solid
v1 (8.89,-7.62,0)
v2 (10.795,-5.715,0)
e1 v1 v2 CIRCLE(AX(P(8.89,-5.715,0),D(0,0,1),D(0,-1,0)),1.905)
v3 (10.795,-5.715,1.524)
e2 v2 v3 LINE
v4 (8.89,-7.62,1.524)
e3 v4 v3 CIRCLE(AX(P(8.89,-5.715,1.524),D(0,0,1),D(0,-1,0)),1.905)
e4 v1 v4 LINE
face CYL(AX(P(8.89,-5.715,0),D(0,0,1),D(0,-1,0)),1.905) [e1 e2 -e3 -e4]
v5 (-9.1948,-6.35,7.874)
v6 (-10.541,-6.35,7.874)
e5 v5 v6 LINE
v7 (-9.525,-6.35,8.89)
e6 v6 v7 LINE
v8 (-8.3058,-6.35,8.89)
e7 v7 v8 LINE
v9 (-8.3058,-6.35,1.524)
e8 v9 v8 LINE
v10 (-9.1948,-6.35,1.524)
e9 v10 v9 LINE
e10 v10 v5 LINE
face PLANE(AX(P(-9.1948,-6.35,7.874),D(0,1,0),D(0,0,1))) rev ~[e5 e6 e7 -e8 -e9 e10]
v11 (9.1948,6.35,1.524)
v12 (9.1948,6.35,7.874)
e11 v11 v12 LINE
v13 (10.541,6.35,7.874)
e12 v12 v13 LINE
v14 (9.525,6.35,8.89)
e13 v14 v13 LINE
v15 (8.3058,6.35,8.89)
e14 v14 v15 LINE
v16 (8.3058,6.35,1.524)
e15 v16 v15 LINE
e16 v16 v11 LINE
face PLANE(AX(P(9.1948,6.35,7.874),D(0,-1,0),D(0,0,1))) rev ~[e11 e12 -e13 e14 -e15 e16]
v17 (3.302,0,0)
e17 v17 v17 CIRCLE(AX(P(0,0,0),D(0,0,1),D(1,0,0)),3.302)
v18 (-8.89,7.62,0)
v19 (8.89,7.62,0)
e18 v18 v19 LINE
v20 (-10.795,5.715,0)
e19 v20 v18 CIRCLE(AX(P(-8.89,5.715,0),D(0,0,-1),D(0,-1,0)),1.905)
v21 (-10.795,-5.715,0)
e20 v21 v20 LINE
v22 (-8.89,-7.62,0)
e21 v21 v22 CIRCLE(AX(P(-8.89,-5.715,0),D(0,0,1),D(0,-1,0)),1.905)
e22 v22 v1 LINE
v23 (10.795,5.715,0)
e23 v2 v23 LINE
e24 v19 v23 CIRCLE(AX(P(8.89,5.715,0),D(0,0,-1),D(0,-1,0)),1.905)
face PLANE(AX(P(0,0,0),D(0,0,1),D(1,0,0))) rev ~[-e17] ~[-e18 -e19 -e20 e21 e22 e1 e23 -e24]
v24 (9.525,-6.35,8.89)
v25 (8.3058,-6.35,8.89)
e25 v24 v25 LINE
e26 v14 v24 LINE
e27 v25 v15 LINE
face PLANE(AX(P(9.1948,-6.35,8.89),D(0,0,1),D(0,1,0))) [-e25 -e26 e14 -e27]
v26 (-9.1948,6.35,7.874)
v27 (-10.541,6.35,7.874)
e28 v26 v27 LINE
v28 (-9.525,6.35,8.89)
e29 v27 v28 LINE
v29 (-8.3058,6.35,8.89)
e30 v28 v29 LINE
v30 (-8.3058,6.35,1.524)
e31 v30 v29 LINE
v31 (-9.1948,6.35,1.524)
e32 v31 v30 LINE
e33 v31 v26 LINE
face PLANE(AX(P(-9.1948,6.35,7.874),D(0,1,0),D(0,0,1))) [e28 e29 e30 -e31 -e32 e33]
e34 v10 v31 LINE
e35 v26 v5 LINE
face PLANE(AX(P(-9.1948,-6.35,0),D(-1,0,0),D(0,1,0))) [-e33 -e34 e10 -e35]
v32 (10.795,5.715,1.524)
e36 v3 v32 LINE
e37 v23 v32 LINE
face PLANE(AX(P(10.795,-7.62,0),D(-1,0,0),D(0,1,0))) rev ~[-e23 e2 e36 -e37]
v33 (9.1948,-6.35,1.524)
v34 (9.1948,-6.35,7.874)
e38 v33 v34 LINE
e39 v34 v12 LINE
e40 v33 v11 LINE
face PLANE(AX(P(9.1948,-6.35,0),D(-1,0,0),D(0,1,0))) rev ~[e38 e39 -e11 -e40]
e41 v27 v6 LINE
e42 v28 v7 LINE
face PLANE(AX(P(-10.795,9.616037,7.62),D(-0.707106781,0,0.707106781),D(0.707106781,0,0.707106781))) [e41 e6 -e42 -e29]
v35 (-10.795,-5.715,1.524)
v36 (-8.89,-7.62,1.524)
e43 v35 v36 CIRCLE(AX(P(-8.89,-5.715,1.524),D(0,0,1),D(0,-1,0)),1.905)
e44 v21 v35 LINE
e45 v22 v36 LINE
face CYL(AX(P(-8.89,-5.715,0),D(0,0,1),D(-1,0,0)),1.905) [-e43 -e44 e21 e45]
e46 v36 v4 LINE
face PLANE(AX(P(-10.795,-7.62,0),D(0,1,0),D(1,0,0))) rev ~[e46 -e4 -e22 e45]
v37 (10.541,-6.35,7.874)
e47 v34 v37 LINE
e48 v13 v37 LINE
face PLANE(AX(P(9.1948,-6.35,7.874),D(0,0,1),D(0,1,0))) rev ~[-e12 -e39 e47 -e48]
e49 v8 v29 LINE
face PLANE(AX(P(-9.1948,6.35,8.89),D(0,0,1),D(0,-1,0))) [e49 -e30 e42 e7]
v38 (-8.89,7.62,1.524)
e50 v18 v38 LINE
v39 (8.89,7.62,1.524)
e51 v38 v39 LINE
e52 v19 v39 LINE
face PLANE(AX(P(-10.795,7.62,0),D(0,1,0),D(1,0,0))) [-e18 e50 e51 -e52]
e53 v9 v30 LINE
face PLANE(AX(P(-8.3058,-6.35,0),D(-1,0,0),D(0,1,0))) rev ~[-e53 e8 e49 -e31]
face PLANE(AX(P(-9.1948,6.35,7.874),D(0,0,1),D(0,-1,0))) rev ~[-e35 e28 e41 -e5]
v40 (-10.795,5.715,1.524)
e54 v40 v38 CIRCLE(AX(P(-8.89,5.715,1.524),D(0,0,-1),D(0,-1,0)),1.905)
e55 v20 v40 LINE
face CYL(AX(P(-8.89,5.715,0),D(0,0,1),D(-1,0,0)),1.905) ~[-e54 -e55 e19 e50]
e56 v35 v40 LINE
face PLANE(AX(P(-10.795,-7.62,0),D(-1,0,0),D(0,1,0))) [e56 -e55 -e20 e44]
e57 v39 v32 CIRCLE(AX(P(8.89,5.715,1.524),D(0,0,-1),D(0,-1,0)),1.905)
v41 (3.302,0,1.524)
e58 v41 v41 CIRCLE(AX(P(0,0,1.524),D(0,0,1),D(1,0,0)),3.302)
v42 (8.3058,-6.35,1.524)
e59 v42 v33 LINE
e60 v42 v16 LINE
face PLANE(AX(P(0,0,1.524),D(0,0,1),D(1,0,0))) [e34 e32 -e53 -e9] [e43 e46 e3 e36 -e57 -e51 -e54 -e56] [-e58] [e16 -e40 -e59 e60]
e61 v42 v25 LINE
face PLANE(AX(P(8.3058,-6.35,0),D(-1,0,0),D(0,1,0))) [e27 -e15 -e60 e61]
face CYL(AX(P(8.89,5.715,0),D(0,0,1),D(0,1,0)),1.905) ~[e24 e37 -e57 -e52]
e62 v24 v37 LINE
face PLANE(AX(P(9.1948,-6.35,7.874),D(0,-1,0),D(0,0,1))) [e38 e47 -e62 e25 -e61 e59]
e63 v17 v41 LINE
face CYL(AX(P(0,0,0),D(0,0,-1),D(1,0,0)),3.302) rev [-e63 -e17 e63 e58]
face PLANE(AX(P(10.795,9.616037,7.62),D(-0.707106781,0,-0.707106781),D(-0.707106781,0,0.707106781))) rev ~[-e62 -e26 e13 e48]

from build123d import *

# Parameters (mm, degrees)
F0_W        = 21.59
F0_H        = 15.24
F0_W_2      = 0.889
F0_H_2      = 12.7
F0_R        = 3.302
F1_DEPTH    = 1.524
F2_DEPTH    = 8.89
F3_W        = 12.7
F3_H        = 1.016
F5_DEPTH    = 1.6002
F4_W        = 12.7
F4_H        = 1.016
F6_DEPTH    = 1.6002
F7_T1_DEPTH = 19.2320747894
F8_R        = 1.905


# Not quite as in the source:
# - a fillet or chamfer that OpenCascade refuses, or shapes differently, is made with other operations: its cross-section is extruded or revolved along the edge and cut away or added


with BuildPart() as f1:
    # F0 (on Top) → F1 (new body)
    with BuildSketch(Plane.XY):
        Rectangle(F0_W, F0_H)
        with Locations((-8.7503, 0)):
            Rectangle(F0_W_2, F0_H_2, mode=Mode.SUBTRACT)
        Circle(F0_R, mode=Mode.SUBTRACT)
        with Locations((8.7503, 0)):
            Rectangle(F0_W_2, F0_H_2, mode=Mode.SUBTRACT)
    extrude(amount=F1_DEPTH)

    # F0 (on Top) → F2 (join)
    with BuildSketch(Plane.XY):
        with Locations((-8.7503, 0)):
            Rectangle(F0_W_2, F0_H_2)
        with Locations((8.7503, 0)):
            Rectangle(F0_W_2, F0_H_2)
    extrude(amount=F2_DEPTH)

    # F3 (on face) → F5 (join)
    with BuildSketch(Plane(origin=(-9.1948, 0, 0), x_dir=(0, -1, 0), z_dir=(-1, 0, 0))):
        with Locations((0, 8.382)):
            Rectangle(F3_W, F3_H)
    extrude(amount=F5_DEPTH)

    # F4 (on face) → F6 (join)
    with BuildSketch(Plane.YZ.offset(9.1948)):
        with Locations((0, 8.382)):
            Rectangle(F4_W, F4_H)
    extrude(amount=F6_DEPTH)

    # F7: chamfer of 1.27 on 2 edges, made by hand

    # F7_s2 → F7_t1 (cut)
    with BuildSketch(Plane.XZ.offset(-9.6160373947)):
        Polygon((-10.795, 7.62), (-9.525, 8.89), (-10.795, 8.89), align=None)
        Polygon((10.795, 7.62), (9.525, 8.89), (10.795, 8.89), align=None)
    extrude(amount=F7_T1_DEPTH, mode=Mode.SUBTRACT)

    # F8
    f8_edges = [f1.edges().sort_by_distance(p)[0] for p in [
        (10.795, -7.62, 0.762),
        (10.795, 7.62, 0.762),
        (-10.795, 7.62, 0.762),
        (-10.795, -7.62, 0.762),
    ]]
    fillet(f8_edges, radius=F8_R)


solid = f1.part
